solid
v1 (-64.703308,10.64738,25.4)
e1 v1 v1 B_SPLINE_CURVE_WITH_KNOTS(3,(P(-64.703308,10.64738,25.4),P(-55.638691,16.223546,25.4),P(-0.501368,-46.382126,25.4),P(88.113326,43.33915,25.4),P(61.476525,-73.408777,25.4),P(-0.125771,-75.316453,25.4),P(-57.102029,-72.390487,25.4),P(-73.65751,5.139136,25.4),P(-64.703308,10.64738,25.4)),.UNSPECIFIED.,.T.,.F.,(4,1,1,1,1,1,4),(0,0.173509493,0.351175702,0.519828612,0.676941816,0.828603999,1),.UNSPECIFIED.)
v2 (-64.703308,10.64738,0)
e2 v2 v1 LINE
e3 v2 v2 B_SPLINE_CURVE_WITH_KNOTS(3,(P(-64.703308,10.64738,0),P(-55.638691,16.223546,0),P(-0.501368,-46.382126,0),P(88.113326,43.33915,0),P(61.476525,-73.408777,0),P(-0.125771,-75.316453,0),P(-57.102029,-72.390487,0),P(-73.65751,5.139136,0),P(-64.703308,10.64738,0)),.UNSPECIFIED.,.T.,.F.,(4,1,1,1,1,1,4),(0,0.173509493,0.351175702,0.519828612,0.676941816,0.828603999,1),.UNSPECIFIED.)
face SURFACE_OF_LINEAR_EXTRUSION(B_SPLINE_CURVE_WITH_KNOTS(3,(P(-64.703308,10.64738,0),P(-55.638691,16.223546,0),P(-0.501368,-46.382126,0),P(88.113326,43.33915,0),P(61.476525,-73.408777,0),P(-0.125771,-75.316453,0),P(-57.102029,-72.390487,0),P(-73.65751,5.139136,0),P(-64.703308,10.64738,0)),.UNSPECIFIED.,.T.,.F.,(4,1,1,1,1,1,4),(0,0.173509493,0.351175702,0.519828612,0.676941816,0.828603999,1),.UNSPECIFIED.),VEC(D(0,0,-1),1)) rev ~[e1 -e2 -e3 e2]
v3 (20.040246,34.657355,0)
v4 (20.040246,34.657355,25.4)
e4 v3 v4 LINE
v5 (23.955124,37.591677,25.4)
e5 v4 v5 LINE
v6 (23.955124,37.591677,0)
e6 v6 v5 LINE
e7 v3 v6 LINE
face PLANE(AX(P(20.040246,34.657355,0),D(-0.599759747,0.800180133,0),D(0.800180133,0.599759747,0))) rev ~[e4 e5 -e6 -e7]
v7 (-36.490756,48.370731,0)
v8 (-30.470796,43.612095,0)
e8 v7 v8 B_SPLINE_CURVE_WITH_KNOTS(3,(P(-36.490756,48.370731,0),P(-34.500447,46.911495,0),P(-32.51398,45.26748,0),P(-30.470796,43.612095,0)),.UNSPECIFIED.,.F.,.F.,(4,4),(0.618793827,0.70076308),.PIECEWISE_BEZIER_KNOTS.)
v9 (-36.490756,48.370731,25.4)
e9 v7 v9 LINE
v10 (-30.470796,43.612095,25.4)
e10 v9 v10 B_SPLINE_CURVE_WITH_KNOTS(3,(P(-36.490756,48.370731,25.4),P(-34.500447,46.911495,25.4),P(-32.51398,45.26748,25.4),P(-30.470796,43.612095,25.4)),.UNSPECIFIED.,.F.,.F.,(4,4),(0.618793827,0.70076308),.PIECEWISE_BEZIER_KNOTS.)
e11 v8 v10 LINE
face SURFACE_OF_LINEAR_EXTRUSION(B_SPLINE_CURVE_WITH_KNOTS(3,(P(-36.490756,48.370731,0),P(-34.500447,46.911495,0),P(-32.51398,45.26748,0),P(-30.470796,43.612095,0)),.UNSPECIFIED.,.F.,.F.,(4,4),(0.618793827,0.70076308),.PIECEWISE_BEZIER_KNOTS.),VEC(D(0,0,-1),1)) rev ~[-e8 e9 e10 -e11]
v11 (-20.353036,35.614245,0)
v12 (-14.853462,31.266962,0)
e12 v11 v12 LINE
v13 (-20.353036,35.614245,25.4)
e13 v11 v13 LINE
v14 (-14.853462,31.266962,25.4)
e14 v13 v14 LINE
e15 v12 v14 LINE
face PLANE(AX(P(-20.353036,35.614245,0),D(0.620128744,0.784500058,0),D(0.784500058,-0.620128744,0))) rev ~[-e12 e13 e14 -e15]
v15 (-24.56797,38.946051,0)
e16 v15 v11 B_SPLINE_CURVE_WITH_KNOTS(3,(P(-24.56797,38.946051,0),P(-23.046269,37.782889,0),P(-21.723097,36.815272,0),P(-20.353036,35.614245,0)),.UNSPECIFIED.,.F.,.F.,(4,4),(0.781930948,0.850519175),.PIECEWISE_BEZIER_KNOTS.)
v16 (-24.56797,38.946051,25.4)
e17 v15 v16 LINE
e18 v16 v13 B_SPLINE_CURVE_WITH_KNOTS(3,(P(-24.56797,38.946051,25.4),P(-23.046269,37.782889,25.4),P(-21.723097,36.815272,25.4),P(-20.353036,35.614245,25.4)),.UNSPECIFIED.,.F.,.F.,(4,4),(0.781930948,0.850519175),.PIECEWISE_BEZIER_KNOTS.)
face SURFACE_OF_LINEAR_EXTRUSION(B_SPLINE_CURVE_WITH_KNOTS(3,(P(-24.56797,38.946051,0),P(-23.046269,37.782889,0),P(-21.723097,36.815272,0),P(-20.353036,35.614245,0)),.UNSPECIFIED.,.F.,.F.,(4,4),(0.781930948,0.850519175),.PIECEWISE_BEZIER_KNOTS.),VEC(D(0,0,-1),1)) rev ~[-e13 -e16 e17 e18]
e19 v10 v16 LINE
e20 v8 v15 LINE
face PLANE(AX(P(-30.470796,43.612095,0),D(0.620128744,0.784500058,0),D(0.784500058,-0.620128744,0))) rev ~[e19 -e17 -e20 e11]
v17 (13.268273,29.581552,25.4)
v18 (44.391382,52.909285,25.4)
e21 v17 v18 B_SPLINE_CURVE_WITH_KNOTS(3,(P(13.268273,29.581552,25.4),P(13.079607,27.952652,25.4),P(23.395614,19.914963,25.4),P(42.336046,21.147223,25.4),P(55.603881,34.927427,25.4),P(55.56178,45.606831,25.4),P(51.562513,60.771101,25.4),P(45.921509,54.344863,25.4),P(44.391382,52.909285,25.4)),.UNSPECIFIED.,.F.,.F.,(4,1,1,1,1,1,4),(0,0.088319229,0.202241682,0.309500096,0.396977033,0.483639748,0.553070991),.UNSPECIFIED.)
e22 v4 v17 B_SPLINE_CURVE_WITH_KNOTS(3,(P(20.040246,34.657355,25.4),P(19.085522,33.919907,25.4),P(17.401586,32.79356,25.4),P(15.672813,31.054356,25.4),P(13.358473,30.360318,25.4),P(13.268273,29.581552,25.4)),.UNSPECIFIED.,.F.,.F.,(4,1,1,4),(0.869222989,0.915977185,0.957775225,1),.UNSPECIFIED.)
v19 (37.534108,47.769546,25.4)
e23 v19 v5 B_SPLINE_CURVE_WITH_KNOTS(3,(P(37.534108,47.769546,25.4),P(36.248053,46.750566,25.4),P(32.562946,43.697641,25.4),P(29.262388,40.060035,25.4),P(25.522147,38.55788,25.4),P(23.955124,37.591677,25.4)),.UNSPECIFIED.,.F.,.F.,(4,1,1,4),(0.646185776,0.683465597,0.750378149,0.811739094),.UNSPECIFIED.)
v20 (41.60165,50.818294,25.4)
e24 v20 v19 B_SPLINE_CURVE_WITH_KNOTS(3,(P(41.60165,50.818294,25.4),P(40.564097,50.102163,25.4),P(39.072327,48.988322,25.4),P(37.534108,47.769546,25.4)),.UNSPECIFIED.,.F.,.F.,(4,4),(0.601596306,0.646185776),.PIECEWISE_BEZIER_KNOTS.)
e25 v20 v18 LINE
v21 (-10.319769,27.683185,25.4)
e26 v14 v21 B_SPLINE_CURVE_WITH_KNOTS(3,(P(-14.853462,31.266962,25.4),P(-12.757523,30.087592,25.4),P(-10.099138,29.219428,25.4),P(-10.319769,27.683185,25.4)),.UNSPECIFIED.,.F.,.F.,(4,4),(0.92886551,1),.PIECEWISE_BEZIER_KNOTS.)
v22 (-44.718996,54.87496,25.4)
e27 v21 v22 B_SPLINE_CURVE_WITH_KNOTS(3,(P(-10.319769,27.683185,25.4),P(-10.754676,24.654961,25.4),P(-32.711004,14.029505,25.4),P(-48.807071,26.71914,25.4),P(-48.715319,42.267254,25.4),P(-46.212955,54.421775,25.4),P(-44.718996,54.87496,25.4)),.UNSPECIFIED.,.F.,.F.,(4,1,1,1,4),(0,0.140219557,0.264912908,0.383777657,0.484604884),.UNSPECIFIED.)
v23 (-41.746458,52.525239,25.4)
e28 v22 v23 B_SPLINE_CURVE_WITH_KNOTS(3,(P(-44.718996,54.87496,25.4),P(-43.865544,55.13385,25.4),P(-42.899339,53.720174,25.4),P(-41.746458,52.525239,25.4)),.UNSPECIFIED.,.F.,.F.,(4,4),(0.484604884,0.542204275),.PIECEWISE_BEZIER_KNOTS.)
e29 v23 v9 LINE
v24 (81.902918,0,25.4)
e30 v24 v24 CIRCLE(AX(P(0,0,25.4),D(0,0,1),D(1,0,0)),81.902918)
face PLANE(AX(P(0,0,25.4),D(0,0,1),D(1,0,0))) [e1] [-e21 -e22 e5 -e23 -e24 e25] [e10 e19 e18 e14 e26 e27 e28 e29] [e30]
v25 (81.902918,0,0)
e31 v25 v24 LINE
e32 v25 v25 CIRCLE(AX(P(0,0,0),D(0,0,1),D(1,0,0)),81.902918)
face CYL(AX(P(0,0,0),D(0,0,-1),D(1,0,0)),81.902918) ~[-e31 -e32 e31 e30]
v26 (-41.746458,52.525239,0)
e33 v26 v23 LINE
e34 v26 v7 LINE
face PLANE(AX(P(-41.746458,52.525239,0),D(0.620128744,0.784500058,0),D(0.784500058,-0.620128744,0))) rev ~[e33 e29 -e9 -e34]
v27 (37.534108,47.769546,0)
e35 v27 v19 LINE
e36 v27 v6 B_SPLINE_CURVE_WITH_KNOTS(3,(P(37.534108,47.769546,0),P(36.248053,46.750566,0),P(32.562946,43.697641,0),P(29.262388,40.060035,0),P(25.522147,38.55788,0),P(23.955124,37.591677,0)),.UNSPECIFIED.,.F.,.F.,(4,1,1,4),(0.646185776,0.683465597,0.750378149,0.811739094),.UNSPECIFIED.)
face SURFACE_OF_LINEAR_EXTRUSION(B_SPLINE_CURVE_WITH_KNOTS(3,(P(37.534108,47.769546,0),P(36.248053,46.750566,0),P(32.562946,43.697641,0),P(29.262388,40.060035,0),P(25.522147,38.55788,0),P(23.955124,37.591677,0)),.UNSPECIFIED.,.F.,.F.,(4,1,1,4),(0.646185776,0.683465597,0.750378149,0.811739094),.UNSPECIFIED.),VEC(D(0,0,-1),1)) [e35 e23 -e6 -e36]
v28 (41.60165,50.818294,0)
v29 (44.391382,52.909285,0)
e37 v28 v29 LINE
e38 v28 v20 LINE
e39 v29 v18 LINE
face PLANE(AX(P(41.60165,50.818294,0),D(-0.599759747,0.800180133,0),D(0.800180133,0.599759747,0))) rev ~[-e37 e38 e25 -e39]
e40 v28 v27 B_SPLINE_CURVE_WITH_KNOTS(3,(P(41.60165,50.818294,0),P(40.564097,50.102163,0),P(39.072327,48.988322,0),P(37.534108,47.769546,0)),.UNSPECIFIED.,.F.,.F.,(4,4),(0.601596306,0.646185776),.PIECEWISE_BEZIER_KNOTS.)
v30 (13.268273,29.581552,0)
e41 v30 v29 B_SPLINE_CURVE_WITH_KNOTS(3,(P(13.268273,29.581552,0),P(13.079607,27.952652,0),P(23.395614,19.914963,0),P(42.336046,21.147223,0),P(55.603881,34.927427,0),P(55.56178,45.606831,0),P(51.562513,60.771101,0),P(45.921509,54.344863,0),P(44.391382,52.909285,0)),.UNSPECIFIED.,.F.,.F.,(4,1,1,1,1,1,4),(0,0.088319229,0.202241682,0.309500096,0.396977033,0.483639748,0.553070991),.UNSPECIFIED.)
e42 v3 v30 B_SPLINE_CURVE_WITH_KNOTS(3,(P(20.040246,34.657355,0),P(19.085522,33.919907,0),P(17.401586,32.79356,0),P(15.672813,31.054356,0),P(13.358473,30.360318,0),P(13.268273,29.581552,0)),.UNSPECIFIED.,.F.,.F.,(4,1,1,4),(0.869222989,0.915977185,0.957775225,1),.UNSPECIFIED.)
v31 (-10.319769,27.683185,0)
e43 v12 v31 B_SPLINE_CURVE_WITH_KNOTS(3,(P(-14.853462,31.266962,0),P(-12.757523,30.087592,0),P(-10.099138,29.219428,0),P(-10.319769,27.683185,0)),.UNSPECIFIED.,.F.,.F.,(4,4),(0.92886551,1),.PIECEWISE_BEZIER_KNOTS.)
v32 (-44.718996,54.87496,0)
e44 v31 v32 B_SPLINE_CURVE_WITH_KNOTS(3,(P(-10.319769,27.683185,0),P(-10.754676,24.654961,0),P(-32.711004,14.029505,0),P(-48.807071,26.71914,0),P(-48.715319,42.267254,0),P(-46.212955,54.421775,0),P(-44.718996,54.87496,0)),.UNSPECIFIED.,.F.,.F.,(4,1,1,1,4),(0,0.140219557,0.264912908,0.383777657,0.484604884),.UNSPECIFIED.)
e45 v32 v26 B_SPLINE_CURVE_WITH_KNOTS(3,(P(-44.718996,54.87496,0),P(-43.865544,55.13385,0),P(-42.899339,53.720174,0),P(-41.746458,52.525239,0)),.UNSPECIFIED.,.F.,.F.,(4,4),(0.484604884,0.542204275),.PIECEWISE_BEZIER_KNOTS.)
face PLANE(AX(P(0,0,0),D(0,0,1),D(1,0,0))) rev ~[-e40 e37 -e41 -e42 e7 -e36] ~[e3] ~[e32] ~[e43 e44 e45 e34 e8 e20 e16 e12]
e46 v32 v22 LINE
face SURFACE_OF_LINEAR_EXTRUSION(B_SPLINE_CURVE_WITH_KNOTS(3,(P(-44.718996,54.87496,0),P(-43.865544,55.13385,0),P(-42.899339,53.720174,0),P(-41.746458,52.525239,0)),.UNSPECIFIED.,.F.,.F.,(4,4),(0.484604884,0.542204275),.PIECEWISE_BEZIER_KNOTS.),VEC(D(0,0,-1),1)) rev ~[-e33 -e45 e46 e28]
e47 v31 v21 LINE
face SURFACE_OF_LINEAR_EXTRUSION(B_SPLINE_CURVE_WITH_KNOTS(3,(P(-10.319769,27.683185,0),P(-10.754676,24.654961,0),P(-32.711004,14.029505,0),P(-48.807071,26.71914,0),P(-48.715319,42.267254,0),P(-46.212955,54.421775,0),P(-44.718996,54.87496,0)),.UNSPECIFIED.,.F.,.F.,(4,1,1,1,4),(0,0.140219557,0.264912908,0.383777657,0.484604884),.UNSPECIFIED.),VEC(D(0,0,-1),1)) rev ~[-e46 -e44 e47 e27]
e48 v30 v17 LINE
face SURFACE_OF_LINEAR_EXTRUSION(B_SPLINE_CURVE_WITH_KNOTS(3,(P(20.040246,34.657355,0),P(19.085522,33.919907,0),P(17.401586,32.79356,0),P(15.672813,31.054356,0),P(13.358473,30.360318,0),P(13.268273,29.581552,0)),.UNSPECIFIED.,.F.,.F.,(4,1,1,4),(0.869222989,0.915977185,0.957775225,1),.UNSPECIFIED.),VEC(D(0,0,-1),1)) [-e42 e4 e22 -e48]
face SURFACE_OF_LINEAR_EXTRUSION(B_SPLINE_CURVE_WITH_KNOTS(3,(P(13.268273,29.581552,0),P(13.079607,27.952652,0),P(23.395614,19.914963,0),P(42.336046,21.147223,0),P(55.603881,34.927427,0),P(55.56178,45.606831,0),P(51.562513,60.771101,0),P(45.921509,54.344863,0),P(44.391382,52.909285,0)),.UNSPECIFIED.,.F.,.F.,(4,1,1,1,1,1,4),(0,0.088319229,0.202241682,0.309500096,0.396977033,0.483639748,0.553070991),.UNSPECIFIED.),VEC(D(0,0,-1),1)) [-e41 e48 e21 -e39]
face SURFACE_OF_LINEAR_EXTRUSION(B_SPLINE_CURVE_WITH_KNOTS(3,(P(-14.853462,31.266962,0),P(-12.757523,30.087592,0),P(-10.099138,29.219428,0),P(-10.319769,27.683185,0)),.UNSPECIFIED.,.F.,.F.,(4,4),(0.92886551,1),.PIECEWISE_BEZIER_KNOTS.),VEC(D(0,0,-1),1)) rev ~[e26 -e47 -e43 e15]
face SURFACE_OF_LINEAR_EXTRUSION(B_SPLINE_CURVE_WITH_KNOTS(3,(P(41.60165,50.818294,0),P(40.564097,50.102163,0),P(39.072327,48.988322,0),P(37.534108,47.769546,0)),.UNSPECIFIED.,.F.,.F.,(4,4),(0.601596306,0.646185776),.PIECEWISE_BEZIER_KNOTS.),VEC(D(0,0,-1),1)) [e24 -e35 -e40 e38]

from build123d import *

# Parameters (mm, degrees)
F0_R     = 81.902918293
F1_DEPTH = 25.4


with BuildPart() as f1:
    # F0 (on Top) → F1 (new body)
    with BuildSketch(Plane.XY):
        Circle(F0_R)
        with BuildLine():
            add(Edge.make_bspline(
                [(-64.7033080459, 10.6473797932), (-55.638691326, 16.2235461657), (-0.5013684948, -46.3821262938), (88.1133259334, 43.339149836), (61.4765252175, -73.4087770429), (-0.1257711411, -75.3164533915), (-57.1020292766, -72.3904873582), (-73.6575101256, 5.1391358077), (-64.7033080459, 10.6473797932)],
                knots=[0, 0, 0, 0, 0.1735094926, 0.3511757019, 0.519828612, 0.6769418156, 0.8286039986, 1, 1, 1, 1], degree=3))
        make_face(mode=Mode.SUBTRACT)
        with BuildLine():
            add(Edge.make_bspline(
                [(-10.3197693825, 27.6831854135), (-10.7546762642, 24.6549609474), (-32.7110043658, 14.0295047318), (-48.8070708673, 26.7191397879), (-48.7153193022, 42.2672541357), (-46.2129546559, 54.4217754372), (-44.7189956903, 54.8749603331)],
                knots=[0, 0, 0, 0, 0.1402195568, 0.264912908, 0.383777657, 0.484604884, 0.484604884, 0.484604884, 0.484604884], degree=3))
            add(Edge.make_bspline(
                [(-44.7189956903, 54.8749603331), (-43.8655444042, 55.1338504641), (-42.8993390105, 53.7201742756), (-41.7464575259, 52.525239209)],
                knots=[0.484604884, 0.484604884, 0.484604884, 0.484604884, 0.542204275, 0.542204275, 0.542204275, 0.542204275], degree=3))
            Line((-41.7464575259, 52.525239209), (-36.4907558108, 48.3707312906))
            add(Edge.make_bspline(
                [(-36.4907558108, 48.3707312906), (-34.5004466095, 46.9114950565), (-32.5139801247, 45.2674795506), (-30.4707956879, 43.6120951742)],
                knots=[0.6187938265, 0.6187938265, 0.6187938265, 0.6187938265, 0.7007630798, 0.7007630798, 0.7007630798, 0.7007630798], degree=3))
            Line((-30.4707956879, 43.6120951742), (-24.5679702911, 38.9460512887))
            add(Edge.make_bspline(
                [(-24.5679702911, 38.9460512887), (-23.0462694735, 37.7828890396), (-21.7230970705, 36.8152719658), (-20.3530360137, 35.6142454177)],
                knots=[0.7819309481, 0.7819309481, 0.7819309481, 0.7819309481, 0.850519175, 0.850519175, 0.850519175, 0.850519175], degree=3))
            Line((-20.3530360137, 35.6142454177), (-14.8534622354, 31.2669624005))
            add(Edge.make_bspline(
                [(-14.8534622354, 31.2669624005), (-12.7575228708, 30.0875918291), (-10.0991376837, 29.2194276214), (-10.3197693825, 27.6831854135)],
                knots=[0.9288655105, 0.9288655105, 0.9288655105, 0.9288655105, 1, 1, 1, 1], degree=3))
        make_face(mode=Mode.SUBTRACT)
        with BuildLine():
            add(Edge.make_bspline(
                [(20.0402461774, 34.6573553744), (19.0855216744, 33.9199072149), (17.4015863072, 32.7935603855), (15.6728127348, 31.0543564349), (13.3584732412, 30.3603178638), (13.2682733238, 29.5815523714)],
                knots=[0.869222989, 0.869222989, 0.869222989, 0.869222989, 0.9159771846, 0.9577752247, 1, 1, 1, 1], degree=3))
            add(Edge.make_bspline(
                [(23.9551238818, 37.5916772387), (22.4871119125, 36.6865231729), (21.214072016, 35.5640417552), (20.0402461774, 34.6573553744)],
                knots=[0.8117390943, 0.8117390943, 0.8117390943, 0.8117390943, 0.869222989, 0.869222989, 0.869222989, 0.869222989], degree=3))
            add(Edge.make_bspline(
                [(37.5341082285, 47.7695457881), (36.2480528135, 46.7505662168), (32.5629459388, 43.6976408534), (29.262387548, 40.0600353259), (25.5221471778, 38.5578801969), (23.9551238818, 37.5916772387)],
                knots=[0.6461857755, 0.6461857755, 0.6461857755, 0.6461857755, 0.6834655967, 0.750378149, 0.8117390943, 0.8117390943, 0.8117390943, 0.8117390943], degree=3))
            add(Edge.make_bspline(
                [(41.6016501152, 50.8182941765), (40.5640970851, 50.102162609), (39.0723272323, 48.9883219955), (37.5341082285, 47.7695457881)],
                knots=[0.6015963056, 0.6015963056, 0.6015963056, 0.6015963056, 0.6461857755, 0.6461857755, 0.6461857755, 0.6461857755], degree=3))
            Line((41.6016501152, 50.8182941765), (44.3913824856, 52.9092848301))
            add(Edge.make_bspline(
                [(13.2682733238, 29.5815523714), (13.0796071411, 27.9526516269), (23.3956142868, 19.9149627224), (42.3360455892, 21.1472231964), (55.603881243, 34.9274274397), (55.5617796072, 45.6068310596), (51.5625129671, 60.7711012443), (45.9215093945, 54.3448631124), (44.3913824856, 52.9092848301)],
                knots=[0, 0, 0, 0, 0.0883192291, 0.202241682, 0.3095000963, 0.3969770332, 0.4836397483, 0.5530709914, 0.5530709914, 0.5530709914, 0.5530709914], degree=3))
        make_face(mode=Mode.SUBTRACT)
        with BuildLine():
            add(Edge.make_bspline(
                [(23.9551238818, 37.5916772387), (22.4871119125, 36.6865231729), (21.214072016, 35.5640417552), (20.0402461774, 34.6573553744)],
                knots=[0.8117390943, 0.8117390943, 0.8117390943, 0.8117390943, 0.869222989, 0.869222989, 0.869222989, 0.869222989], degree=3))
            Line((20.0402461774, 34.6573553744), (23.9551238818, 37.5916772387))
        make_face()
    extrude(amount=F1_DEPTH)


solid = f1.part
